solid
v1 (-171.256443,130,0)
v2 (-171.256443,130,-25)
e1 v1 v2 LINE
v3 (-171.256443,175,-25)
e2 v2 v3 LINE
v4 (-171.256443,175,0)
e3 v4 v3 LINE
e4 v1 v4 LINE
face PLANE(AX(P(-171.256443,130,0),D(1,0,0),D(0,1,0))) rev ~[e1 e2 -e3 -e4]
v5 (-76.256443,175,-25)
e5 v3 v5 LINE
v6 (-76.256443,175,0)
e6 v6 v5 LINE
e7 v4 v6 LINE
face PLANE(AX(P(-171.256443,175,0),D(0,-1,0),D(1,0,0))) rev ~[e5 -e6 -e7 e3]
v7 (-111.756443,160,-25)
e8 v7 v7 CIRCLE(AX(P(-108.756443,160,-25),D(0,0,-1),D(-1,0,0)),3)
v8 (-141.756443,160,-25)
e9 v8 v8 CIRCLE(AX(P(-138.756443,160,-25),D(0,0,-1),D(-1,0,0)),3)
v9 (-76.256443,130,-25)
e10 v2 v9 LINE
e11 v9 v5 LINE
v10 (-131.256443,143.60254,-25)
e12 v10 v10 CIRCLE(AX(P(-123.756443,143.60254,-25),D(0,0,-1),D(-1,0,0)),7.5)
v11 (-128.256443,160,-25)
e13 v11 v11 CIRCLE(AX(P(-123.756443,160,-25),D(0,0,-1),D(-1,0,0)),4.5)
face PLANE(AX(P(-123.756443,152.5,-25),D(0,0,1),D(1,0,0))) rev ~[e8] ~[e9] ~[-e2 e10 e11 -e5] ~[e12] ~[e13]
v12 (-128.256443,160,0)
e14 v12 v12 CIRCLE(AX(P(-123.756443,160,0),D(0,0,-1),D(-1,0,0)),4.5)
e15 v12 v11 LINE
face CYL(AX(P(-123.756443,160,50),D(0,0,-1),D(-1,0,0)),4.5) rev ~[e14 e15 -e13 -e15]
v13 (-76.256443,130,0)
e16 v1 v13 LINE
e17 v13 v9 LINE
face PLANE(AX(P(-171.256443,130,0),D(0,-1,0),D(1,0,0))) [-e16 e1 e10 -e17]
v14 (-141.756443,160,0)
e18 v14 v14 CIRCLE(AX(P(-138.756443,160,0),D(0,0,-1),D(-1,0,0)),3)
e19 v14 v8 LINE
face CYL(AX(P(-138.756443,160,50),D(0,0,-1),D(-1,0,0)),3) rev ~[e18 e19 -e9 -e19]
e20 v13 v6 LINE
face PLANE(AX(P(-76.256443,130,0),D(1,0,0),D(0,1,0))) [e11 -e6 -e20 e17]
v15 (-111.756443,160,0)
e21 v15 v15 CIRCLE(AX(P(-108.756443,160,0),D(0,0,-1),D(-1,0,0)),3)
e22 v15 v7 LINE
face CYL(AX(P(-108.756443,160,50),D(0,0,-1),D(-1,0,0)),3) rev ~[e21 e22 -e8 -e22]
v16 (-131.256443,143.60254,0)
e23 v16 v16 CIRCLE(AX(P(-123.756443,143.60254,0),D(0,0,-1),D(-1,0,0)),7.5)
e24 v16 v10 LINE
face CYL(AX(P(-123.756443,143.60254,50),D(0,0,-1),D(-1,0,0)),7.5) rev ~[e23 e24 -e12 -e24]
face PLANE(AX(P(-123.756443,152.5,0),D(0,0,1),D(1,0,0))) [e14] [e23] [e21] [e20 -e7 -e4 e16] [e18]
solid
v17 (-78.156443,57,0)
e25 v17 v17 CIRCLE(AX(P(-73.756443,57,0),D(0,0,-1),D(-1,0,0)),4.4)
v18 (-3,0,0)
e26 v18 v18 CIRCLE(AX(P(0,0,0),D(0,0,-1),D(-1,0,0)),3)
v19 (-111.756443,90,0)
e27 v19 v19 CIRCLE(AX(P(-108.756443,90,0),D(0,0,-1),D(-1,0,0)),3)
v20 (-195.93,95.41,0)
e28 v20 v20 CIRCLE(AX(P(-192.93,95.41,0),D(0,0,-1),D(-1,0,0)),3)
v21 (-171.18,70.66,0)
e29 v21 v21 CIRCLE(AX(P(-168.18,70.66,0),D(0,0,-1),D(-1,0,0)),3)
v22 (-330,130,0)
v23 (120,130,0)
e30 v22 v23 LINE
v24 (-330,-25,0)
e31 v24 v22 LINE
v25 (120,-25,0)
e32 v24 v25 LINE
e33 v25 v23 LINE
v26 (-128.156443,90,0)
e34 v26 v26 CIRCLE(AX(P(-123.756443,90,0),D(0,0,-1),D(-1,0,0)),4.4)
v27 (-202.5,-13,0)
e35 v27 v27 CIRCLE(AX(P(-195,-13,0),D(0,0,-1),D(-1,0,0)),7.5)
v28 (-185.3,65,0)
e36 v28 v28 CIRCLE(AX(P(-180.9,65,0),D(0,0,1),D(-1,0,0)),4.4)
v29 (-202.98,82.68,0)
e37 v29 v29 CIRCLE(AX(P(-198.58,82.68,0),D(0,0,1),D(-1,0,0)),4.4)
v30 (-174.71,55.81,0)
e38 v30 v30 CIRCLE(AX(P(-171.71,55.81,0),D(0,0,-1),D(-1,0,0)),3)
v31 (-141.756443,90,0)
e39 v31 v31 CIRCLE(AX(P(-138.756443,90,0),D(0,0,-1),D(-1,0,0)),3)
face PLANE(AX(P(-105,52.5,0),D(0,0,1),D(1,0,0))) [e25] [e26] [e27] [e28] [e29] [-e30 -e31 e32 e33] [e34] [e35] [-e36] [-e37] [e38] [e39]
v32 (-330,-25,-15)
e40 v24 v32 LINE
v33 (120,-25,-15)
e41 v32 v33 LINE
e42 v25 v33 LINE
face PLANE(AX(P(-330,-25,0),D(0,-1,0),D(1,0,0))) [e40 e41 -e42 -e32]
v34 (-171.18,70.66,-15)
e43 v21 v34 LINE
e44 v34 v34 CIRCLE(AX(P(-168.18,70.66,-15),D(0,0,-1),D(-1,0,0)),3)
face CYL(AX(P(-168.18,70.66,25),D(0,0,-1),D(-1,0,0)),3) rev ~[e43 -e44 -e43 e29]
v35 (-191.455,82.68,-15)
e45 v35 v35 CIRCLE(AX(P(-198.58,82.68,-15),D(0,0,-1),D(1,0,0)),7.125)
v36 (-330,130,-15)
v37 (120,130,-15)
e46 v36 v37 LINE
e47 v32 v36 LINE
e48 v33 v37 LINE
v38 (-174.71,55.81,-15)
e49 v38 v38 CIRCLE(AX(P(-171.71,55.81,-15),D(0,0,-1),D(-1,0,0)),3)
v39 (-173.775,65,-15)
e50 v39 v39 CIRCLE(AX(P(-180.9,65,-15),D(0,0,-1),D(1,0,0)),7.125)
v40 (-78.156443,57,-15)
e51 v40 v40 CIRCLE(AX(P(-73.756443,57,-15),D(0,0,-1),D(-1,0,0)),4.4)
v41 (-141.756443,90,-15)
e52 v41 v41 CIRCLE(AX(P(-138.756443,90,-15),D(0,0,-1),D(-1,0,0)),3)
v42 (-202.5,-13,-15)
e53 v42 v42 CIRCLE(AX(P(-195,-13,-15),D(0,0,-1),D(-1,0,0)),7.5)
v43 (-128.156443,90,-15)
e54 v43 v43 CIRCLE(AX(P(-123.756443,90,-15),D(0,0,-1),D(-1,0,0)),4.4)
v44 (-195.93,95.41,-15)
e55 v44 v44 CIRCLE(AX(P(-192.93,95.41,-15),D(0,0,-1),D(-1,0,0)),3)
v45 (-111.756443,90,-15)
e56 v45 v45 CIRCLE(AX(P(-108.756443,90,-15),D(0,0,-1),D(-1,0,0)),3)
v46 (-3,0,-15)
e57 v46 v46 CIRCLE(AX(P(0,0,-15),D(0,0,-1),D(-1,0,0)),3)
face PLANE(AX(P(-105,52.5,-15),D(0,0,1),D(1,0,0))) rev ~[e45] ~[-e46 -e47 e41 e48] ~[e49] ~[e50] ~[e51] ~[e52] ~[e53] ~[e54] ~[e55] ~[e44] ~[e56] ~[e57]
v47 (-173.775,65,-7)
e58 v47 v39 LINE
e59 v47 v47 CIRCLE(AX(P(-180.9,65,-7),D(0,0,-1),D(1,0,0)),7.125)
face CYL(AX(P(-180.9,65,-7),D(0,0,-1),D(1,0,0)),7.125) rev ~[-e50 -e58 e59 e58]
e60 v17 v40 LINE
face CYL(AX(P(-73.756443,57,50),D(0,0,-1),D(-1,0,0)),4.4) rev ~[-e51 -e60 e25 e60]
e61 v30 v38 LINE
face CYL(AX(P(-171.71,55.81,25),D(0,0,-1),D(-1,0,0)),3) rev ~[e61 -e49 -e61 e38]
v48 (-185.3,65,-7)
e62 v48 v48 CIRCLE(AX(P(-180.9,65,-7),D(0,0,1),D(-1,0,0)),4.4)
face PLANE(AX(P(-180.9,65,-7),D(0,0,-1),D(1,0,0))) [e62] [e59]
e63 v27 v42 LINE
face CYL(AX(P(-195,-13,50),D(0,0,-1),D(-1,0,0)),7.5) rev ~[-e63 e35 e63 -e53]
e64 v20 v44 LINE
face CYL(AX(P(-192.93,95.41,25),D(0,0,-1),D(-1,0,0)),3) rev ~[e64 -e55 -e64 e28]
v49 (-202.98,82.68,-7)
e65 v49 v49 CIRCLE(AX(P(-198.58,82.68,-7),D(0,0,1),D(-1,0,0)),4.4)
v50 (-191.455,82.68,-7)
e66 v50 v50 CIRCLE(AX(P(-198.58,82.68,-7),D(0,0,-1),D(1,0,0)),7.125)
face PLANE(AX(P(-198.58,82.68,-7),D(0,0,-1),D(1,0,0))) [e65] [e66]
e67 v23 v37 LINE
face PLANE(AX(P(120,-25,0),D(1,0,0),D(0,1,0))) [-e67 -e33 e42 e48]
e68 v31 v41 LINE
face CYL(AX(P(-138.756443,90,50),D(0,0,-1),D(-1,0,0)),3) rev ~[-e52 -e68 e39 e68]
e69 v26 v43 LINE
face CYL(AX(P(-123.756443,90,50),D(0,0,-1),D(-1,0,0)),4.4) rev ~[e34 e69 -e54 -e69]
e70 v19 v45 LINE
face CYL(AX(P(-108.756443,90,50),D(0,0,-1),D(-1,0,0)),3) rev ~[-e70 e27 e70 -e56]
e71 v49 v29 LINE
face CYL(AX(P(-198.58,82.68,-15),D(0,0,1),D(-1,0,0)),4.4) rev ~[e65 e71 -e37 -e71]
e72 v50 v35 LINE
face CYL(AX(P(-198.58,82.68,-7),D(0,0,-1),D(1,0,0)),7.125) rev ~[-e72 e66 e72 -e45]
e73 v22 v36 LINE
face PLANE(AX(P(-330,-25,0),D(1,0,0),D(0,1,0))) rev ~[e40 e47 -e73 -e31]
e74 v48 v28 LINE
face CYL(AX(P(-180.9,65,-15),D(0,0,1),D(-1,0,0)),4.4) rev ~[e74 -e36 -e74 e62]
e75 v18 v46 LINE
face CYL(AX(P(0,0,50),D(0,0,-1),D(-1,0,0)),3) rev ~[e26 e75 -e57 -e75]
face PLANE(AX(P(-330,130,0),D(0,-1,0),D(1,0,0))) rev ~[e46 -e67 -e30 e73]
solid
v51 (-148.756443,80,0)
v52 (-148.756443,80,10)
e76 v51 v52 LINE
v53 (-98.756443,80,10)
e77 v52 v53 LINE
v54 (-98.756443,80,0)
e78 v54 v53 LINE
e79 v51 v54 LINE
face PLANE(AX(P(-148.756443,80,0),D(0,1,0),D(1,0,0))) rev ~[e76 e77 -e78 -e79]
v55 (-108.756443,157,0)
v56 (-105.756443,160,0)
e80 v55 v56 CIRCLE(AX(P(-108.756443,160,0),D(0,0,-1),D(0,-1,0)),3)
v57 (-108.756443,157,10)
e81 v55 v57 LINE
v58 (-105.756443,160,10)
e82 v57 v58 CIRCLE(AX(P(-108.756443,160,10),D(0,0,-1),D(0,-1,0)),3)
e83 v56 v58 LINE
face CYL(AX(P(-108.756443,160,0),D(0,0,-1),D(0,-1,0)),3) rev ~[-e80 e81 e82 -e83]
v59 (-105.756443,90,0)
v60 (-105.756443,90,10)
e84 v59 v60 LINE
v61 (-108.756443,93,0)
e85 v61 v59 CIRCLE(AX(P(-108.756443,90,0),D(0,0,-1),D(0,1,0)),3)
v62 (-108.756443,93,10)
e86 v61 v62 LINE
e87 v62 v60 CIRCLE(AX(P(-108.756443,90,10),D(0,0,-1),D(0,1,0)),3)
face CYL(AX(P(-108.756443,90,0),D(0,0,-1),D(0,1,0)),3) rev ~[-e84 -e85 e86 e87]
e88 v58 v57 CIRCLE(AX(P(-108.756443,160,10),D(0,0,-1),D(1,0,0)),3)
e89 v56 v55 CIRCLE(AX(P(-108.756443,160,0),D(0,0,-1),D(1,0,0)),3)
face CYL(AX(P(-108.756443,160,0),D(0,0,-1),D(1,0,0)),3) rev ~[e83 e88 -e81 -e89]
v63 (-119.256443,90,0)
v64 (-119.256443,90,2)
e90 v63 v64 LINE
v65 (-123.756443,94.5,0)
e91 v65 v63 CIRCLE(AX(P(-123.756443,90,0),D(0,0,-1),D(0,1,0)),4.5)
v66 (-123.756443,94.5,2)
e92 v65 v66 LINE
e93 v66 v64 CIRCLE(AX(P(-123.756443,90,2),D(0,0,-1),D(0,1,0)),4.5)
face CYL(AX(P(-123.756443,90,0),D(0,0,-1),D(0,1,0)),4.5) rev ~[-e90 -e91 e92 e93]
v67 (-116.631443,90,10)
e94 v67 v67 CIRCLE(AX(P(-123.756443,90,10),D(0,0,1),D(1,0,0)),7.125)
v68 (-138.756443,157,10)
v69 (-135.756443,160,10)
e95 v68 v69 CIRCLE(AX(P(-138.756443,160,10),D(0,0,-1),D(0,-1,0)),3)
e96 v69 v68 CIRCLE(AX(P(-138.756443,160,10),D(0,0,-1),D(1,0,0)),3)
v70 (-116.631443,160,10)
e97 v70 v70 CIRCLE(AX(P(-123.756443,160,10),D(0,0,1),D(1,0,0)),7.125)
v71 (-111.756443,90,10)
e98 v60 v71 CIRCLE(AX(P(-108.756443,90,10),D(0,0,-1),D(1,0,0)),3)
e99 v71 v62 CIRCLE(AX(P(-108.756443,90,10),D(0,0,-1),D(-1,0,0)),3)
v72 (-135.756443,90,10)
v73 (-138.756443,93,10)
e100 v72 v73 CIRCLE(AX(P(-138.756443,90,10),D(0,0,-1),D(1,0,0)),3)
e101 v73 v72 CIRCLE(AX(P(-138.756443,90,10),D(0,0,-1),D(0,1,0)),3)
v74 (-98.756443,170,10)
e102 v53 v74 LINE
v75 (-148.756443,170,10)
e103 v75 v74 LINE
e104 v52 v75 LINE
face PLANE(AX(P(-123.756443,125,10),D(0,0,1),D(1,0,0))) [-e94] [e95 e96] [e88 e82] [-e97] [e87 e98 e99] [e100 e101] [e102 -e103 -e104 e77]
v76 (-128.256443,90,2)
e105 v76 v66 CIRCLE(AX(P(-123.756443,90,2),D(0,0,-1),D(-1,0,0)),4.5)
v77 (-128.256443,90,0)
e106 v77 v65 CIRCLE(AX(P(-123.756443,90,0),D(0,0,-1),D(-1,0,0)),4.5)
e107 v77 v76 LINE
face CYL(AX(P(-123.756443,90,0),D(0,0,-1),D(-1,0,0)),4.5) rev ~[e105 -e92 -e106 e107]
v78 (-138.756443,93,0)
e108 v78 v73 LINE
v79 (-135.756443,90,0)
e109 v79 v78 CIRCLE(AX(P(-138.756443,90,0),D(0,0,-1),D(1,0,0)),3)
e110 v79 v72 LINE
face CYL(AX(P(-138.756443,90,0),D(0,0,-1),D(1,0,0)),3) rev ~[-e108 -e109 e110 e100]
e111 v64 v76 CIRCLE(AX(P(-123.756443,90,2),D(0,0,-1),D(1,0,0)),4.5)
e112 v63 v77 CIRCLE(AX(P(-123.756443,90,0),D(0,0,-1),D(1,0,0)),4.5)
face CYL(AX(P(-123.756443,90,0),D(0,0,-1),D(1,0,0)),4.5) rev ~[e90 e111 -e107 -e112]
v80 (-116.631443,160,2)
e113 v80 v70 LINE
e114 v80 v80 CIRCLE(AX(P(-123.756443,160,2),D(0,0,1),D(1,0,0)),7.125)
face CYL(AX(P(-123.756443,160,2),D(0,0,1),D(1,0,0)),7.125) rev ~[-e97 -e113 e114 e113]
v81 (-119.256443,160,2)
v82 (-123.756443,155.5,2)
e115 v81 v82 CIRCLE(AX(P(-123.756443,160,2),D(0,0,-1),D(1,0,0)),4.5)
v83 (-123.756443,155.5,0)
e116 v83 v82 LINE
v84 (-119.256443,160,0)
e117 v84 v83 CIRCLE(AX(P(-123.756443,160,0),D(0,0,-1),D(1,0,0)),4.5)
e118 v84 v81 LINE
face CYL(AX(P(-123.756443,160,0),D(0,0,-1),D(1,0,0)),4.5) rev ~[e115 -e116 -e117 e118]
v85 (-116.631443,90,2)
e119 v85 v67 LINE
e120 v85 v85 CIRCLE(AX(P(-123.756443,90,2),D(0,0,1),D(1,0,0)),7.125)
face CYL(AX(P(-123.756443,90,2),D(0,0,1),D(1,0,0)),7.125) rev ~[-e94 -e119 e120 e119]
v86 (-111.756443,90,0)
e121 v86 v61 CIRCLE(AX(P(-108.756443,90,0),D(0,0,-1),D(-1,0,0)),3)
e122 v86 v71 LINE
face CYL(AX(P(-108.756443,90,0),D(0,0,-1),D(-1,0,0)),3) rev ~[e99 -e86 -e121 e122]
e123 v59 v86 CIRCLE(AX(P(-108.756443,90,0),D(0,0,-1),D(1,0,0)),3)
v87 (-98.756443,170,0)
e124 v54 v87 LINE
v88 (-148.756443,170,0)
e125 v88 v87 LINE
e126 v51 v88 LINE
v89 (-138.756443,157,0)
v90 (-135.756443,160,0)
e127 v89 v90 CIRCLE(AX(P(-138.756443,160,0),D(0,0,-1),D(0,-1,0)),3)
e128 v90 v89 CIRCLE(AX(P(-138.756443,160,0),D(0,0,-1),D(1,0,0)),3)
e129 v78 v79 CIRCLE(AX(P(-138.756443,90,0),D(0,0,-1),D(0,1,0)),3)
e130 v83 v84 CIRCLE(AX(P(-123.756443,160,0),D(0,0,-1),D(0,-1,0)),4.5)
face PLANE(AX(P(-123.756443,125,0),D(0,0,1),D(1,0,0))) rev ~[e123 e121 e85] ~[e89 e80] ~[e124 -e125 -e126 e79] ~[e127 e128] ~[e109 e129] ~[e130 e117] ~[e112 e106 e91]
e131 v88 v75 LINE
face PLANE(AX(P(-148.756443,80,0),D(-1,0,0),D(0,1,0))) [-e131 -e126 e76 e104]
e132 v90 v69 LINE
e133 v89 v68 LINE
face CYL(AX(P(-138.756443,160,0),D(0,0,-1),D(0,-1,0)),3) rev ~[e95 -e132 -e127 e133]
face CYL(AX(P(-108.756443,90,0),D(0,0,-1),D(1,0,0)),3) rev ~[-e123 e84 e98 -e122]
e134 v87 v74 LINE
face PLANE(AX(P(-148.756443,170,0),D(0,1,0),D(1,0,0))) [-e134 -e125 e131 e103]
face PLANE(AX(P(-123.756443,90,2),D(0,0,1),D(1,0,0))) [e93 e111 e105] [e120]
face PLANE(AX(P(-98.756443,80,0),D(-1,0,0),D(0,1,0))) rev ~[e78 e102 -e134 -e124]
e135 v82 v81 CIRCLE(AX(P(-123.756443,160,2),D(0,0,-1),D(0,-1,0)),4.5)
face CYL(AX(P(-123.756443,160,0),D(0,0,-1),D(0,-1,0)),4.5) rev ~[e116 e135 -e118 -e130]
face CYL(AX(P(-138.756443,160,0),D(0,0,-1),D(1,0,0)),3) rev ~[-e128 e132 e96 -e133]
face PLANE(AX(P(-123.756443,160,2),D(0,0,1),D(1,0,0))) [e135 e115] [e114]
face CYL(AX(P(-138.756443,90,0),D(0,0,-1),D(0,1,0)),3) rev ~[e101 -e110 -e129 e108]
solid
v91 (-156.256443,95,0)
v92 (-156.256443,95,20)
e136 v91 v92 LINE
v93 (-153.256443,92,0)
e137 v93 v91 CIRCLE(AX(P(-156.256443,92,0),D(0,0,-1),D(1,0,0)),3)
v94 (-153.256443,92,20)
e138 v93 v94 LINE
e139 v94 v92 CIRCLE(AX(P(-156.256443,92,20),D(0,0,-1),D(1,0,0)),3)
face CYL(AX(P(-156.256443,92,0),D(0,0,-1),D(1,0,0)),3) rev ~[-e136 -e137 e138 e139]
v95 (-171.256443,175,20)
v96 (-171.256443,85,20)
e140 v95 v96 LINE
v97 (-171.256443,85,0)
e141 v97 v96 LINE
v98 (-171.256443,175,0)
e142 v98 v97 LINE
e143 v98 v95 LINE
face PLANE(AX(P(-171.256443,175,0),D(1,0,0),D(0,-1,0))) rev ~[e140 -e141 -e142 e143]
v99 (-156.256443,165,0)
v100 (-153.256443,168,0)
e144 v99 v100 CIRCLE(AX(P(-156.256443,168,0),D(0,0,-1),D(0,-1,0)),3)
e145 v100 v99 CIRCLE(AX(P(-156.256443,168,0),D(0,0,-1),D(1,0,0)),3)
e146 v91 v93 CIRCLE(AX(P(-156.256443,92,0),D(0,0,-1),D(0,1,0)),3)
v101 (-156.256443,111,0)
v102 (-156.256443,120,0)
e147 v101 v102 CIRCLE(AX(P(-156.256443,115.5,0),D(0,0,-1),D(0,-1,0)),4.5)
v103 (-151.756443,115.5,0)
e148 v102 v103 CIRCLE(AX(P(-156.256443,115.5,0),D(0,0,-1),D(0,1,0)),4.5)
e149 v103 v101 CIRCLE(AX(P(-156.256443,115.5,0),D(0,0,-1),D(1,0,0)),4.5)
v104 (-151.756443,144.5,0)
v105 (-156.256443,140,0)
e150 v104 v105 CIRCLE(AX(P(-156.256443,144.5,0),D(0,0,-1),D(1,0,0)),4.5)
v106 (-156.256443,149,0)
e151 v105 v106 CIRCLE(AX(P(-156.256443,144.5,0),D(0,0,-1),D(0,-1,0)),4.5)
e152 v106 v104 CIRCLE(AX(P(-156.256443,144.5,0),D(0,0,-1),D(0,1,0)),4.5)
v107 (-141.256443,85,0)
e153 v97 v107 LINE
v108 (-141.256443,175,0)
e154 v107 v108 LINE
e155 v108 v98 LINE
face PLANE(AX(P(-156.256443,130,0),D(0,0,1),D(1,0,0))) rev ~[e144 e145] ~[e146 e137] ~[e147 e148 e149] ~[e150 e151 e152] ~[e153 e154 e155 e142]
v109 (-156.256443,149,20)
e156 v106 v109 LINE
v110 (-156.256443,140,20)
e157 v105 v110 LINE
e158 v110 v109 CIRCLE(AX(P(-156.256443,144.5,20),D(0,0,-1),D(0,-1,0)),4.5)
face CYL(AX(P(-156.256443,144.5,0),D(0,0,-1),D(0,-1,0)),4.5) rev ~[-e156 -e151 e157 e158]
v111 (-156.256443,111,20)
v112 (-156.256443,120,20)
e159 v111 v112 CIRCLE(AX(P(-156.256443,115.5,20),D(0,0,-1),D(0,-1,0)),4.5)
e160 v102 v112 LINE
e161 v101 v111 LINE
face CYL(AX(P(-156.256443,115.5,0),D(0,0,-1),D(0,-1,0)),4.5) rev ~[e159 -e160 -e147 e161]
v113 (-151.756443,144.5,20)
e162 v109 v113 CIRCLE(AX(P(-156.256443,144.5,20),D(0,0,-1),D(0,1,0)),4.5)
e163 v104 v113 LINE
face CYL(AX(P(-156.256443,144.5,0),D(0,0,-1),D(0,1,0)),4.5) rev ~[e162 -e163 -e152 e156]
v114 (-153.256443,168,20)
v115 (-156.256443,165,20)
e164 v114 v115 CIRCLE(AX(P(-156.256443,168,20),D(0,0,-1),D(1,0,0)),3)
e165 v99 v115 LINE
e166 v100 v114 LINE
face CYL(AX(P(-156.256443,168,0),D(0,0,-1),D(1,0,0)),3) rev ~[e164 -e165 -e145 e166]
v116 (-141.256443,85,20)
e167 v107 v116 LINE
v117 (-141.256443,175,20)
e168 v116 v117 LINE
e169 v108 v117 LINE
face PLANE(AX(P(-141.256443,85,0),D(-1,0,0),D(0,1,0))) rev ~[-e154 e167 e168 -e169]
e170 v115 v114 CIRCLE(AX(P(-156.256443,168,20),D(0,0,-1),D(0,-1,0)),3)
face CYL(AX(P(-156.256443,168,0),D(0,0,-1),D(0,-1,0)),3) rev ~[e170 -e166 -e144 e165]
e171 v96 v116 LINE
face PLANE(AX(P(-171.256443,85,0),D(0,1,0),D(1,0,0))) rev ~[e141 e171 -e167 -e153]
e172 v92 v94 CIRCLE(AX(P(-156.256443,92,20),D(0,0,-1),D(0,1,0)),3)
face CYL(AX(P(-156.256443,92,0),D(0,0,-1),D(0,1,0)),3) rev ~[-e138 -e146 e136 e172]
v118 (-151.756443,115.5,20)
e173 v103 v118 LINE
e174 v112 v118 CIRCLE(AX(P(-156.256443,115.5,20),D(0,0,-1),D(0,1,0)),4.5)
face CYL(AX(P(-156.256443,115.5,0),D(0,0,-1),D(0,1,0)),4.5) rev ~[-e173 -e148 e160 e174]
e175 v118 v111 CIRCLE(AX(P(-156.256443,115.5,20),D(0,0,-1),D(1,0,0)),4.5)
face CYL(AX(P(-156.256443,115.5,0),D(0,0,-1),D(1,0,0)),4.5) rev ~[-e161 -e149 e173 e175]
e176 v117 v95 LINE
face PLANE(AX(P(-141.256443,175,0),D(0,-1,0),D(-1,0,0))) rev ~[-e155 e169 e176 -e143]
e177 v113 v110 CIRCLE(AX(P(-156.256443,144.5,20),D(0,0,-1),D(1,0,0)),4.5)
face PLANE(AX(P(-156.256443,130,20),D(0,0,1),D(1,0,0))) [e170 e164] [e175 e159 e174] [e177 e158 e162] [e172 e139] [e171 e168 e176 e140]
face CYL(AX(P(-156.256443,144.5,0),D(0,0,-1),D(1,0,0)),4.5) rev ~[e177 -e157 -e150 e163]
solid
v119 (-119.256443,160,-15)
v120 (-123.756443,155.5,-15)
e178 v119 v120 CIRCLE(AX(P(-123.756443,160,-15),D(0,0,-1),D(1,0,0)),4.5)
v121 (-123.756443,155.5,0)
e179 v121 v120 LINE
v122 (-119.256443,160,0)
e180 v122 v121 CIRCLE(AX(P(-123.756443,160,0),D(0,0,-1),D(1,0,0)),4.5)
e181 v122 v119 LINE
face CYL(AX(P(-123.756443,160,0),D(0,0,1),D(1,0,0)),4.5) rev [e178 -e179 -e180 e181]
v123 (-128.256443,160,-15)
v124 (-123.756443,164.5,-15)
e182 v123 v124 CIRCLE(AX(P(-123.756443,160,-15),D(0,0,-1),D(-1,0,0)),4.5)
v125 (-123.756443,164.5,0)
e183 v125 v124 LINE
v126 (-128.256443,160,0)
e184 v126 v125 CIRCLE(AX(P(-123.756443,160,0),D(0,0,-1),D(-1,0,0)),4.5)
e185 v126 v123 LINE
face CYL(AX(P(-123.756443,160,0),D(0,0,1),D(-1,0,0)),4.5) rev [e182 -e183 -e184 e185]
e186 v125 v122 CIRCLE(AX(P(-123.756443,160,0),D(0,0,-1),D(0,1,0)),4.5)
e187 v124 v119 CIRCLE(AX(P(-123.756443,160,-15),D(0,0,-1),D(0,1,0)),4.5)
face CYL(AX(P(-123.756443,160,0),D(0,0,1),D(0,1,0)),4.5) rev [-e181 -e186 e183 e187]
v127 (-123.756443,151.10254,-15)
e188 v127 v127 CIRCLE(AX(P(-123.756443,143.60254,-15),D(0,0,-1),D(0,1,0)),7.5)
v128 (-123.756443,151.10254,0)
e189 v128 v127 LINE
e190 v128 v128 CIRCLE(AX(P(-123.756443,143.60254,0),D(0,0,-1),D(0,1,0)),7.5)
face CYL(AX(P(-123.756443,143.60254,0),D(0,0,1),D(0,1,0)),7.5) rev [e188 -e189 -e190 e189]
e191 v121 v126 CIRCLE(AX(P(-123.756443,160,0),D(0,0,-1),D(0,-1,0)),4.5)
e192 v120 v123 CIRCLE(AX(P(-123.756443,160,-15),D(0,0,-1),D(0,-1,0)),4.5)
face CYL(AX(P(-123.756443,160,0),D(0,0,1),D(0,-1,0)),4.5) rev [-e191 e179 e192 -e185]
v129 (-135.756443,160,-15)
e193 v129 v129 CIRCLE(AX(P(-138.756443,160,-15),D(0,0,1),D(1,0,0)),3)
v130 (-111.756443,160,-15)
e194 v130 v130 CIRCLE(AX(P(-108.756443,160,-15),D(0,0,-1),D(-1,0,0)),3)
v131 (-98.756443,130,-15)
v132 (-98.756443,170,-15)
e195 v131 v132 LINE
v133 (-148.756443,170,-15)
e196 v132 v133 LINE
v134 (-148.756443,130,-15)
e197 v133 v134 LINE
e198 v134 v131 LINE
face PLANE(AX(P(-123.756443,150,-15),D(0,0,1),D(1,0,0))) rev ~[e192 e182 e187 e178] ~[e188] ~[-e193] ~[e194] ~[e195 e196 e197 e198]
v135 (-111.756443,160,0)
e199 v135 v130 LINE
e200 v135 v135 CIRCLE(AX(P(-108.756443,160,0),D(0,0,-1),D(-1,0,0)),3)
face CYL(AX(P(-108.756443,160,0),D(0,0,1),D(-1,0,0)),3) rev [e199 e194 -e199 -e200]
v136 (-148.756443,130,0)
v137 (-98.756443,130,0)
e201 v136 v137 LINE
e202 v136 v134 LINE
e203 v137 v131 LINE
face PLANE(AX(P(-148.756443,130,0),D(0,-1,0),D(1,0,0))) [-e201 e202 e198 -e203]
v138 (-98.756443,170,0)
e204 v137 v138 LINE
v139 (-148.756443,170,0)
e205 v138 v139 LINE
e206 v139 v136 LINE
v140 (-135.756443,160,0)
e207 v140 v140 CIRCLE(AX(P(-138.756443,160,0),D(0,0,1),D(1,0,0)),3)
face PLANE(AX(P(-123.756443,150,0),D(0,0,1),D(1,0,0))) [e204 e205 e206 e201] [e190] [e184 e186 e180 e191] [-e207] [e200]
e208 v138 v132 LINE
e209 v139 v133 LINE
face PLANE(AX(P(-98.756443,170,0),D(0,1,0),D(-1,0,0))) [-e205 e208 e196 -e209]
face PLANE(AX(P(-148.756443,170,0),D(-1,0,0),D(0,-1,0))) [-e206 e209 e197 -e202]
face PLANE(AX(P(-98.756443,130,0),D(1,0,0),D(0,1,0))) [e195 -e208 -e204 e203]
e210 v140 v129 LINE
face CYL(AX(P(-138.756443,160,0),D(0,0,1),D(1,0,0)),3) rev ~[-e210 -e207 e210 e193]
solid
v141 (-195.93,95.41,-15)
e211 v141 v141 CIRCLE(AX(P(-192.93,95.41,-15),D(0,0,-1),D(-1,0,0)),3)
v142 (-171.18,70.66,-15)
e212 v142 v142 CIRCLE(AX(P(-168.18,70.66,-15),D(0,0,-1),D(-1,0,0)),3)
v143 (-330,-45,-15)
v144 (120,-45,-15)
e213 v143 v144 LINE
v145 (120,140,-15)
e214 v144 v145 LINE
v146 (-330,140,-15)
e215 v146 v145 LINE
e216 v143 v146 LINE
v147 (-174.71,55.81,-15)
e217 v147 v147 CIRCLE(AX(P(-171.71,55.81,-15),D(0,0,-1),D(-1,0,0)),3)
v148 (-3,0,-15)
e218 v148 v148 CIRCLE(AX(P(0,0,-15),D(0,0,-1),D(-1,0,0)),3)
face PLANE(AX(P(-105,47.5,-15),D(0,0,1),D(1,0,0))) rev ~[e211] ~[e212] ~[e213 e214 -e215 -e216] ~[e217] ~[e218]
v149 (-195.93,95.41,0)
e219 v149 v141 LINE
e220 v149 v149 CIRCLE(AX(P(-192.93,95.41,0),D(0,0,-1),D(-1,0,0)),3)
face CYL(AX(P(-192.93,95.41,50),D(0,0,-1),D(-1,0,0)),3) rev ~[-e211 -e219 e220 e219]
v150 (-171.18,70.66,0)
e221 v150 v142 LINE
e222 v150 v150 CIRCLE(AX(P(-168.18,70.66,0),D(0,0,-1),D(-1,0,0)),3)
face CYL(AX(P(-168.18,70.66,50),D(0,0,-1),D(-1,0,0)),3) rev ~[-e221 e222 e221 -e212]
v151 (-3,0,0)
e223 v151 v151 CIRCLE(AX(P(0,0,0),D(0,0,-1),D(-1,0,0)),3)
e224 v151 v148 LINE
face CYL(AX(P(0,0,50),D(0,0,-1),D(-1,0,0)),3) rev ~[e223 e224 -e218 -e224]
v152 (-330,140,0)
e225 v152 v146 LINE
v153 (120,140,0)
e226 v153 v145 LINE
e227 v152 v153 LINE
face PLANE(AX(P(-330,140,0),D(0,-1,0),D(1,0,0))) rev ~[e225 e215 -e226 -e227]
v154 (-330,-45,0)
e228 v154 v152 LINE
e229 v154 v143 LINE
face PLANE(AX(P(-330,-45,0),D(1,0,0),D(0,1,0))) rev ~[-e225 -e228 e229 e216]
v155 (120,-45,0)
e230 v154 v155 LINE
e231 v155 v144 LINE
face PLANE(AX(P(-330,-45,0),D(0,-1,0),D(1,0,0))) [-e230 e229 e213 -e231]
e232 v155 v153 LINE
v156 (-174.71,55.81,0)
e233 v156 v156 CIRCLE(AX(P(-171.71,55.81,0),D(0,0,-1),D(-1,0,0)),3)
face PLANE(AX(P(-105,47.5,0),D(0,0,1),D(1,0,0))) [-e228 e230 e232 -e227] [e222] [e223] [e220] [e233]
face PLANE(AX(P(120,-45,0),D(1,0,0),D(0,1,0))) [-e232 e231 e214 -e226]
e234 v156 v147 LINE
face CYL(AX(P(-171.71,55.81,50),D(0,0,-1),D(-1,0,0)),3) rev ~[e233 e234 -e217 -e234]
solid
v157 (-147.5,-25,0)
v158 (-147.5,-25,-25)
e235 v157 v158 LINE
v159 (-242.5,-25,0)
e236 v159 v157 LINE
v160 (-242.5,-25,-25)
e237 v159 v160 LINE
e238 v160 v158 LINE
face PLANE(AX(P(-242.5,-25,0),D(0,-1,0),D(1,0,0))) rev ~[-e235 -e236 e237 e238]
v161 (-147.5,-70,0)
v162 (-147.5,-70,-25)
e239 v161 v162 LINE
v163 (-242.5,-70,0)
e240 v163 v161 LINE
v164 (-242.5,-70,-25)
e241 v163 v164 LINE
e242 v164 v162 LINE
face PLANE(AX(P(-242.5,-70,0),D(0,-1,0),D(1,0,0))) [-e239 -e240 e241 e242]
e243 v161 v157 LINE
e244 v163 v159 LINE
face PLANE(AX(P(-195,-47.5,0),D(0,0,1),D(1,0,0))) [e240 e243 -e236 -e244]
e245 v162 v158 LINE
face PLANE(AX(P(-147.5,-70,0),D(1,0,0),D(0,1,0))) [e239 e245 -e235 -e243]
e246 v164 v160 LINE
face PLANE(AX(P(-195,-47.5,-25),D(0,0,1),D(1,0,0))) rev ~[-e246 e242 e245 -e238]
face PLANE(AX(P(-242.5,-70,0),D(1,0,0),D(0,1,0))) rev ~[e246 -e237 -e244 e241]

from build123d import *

# Parameters (mm, degrees)
F0_W             = 450
F0_H             = 155
F1_DEPTH         = 15
F4_W             = 95
F4_H             = 45
F5_DEPTH         = 25
F7_DEPTH         = 20
F9_D             = 6
F9_DEPTH         = 25
F9_TIP           = 1.8025818571
F11_D            = 8.8
F11_DEPTH        = 25
F11_CBORE_D      = 14.25
F11_CBORE_DEPTH  = 8
F11_TIP          = 2.6437867237
F13_R            = 3
F14_DEPTH        = 15
F15_W            = 50
F15_H            = 90
F16_DEPTH        = 10
F18_D            = 8.8
F18_DEPTH        = 15.75
F18_CBORE_D      = 14.25
F18_CBORE_DEPTH  = 8
F18_TIP          = 2.6437867237
F19_D            = 8.8
F19_DEPTH        = 50
F19_TIP          = 2.6437867237
F21_D            = 8.8
F21_DEPTH        = 50
F21_TIP          = 2.6437867237
F22_D            = 15
F22_DEPTH        = 50
F22_TIP          = 4.5064546427
F23_W            = 450
F23_H            = 185
F24_DEPTH        = 15
F25_D            = 6
F25_DEPTH        = 50
F25_TIP          = 1.8025818571
F27_D            = 6
F27_DEPTH        = 50
F27_TIP          = 1.8025818571
F27_2_D          = 6
F27_2_DEPTH      = 50
F27_2_TIP        = 1.8025818571
F28_D            = 15
F28_DEPTH        = 50
F28_TIP          = 4.5064546427
F29_D            = 6
F29_DEPTH        = 50
F29_TIP          = 1.8025818571
F29_ON_F15_D     = 6
F29_ON_F15_DEPTH = 50
F29_ON_F15_TIP   = 1.8025818571
F30_D            = 9
F30_DEPTH        = 50
F30_TIP          = 2.7038727856


# Not quite as in the source:
# - a feature of the source that left no trace in its solid (it failed there, or was rolled back) is left out


with BuildPart() as f1:
    # F0 (on Top) → F1 (new body)
    with BuildSketch(Plane.XY):
        with Locations((-105, 52.5)):
            Rectangle(F0_W, F0_H)
    extrude(amount=-F1_DEPTH)

    # F9
    with Locations(Plane.XY):
        with Locations((-192.93, 95.41), (-168.18, 70.66), (-171.71, 55.81)):
            Hole(F9_D / 2, depth=F9_DEPTH)
            with Locations((0, 0, -(F9_DEPTH + F9_TIP / 2))):  # 118° drill point
                Cone(0, F9_D / 2, F9_TIP, mode=Mode.SUBTRACT)

    # F11
    with Locations(Plane(origin=(0, 0, -15), x_dir=(1, 0, 0), z_dir=(0, 0, -1))):
        with Locations((-180.9, -65), (-198.58, -82.68)):
            CounterBoreHole(F11_D / 2, F11_CBORE_D / 2, F11_CBORE_DEPTH, depth=F11_DEPTH)
            with Locations((0, 0, -(F11_DEPTH + F11_TIP / 2))):  # 118° drill point
                Cone(0, F11_D / 2, F11_TIP, mode=Mode.SUBTRACT)

    # F19
    with Locations(Plane.XY):
        with Locations((-123.7564434702, 90)):
            Hole(F19_D / 2, depth=F19_DEPTH)
            with Locations((0, 0, -(F19_DEPTH + F19_TIP / 2))):  # 118° drill point
                Cone(0, F19_D / 2, F19_TIP, mode=Mode.SUBTRACT)

    # F21
    with Locations(Plane.XY):
        with Locations((-73.7564434702, 57)):
            Hole(F21_D / 2, depth=F21_DEPTH)
            with Locations((0, 0, -(F21_DEPTH + F21_TIP / 2))):  # 118° drill point
                Cone(0, F21_D / 2, F21_TIP, mode=Mode.SUBTRACT)

    # F22
    with Locations(Plane.XY):
        with Locations((-195, -13)):
            Hole(F22_D / 2, depth=F22_DEPTH)
            with Locations((0, 0, -(F22_DEPTH + F22_TIP / 2))):  # 118° drill point
                Cone(0, F22_D / 2, F22_TIP, mode=Mode.SUBTRACT)

    # F27
    with Locations(Plane.XY):
        with Locations((0, 0)):
            Hole(F27_D / 2, depth=F27_DEPTH)
            with Locations((0, 0, -(F27_DEPTH + F27_TIP / 2))):  # 118° drill point
                Cone(0, F27_D / 2, F27_TIP, mode=Mode.SUBTRACT)

    # F29 on F15
    with Locations(Plane.XY):
        with Locations((-138.7564434702, 90), (-108.7564434702, 90)):
            Hole(F29_ON_F15_D / 2, depth=F29_ON_F15_DEPTH)
            with Locations((0, 0, -(F29_ON_F15_DEPTH + F29_ON_F15_TIP / 2))):  # 118° drill point
                Cone(0, F29_ON_F15_D / 2, F29_ON_F15_TIP, mode=Mode.SUBTRACT)


with BuildPart() as f5:
    # F4 (on face) → F5 (new body)
    with BuildSketch(Plane.XY):
        with Locations((-195, -47.5)):
            Rectangle(F4_W, F4_H)
    extrude(amount=-F5_DEPTH)


with BuildPart() as f5b:
    # F4 (on face) → F5, piece 2 (new body)
    with BuildSketch(Plane.XY):
        with Locations((-123.7564434702, 152.5)):
            Rectangle(F4_W, F4_H)
    extrude(amount=-F5_DEPTH)

    # F28
    with Locations(Plane.XY):
        with Locations((-123.7564434702, 143.6025403784)):
            Hole(F28_D / 2, depth=F28_DEPTH)
            with Locations((0, 0, -(F28_DEPTH + F28_TIP / 2))):  # 118° drill point
                Cone(0, F28_D / 2, F28_TIP, mode=Mode.SUBTRACT)

    # F29
    with Locations(Plane.XY):
        with Locations((-108.7564434702, 160), (-138.7564434702, 160)):
            Hole(F29_D / 2, depth=F29_DEPTH)
            with Locations((0, 0, -(F29_DEPTH + F29_TIP / 2))):  # 118° drill point
                Cone(0, F29_D / 2, F29_TIP, mode=Mode.SUBTRACT)

    # F30
    with Locations(Plane.XY):
        with Locations((-123.7564434702, 160)):
            Hole(F30_D / 2, depth=F30_DEPTH)
            with Locations((0, 0, -(F30_DEPTH + F30_TIP / 2))):  # 118° drill point
                Cone(0, F30_D / 2, F30_TIP, mode=Mode.SUBTRACT)


with BuildPart() as f7:
    # F6 (on face) → F7 (new body)
    with BuildSketch(Plane.XY):
        Polygon((-141.2564434702, 175), (-171.2564434702, 175), (-171.2564434702, 85), (-141.2564434702, 85), (-141.2564434702, 168), align=None)
        with BuildLine():
            ThreePointArc((-153.2564434702, 92), (-158.3777638137, 89.8786796564), (-156.2564434702, 95))
            ThreePointArc((-156.2564434702, 95), (-154.1351231266, 94.1213203436), (-153.2564434702, 92))
        make_face(mode=Mode.SUBTRACT)
        with BuildLine():
            ThreePointArc((-156.2564434702, 111), (-160.7564434702, 115.5), (-156.2564434702, 120))
            ThreePointArc((-156.2564434702, 120), (-153.0744629548, 118.6819805153), (-151.7564434702, 115.5))
            ThreePointArc((-151.7564434702, 115.5), (-153.0744629548, 112.3180194847), (-156.2564434702, 111))
        make_face(mode=Mode.SUBTRACT)
        with BuildLine():
            ThreePointArc((-156.2564434702, 140), (-160.7564434702, 144.5), (-156.2564434702, 149))
            ThreePointArc((-156.2564434702, 149), (-153.0744629548, 147.6819805153), (-151.7564434702, 144.5))
            ThreePointArc((-151.7564434702, 144.5), (-153.0744629548, 141.3180194847), (-156.2564434702, 140))
        make_face(mode=Mode.SUBTRACT)
        with BuildLine():
            ThreePointArc((-156.2564434702, 165), (-158.3777638137, 170.1213203436), (-153.2564434702, 168))
            ThreePointArc((-153.2564434702, 168), (-154.1351231266, 165.8786796564), (-156.2564434702, 165))
        make_face(mode=Mode.SUBTRACT)
    extrude(amount=F7_DEPTH)


with BuildPart() as f14:
    # F13 (on face) → F14 (new body)
    with BuildSketch(Plane.XY):
        Polygon((-148.7564434702, 170), (-148.7564434702, 130), (-98.7564434702, 130), (-98.7564434702, 170), (-123.7564434702, 170), align=None)
        with BuildLine():
            ThreePointArc((-116.2564434702, 143.6025403784), (-129.0597443291, 138.2992395195), (-123.7564434702, 151.1025403784))
            ThreePointArc((-123.7564434702, 151.1025403784), (-118.4531426113, 148.9058412373), (-116.2564434702, 143.6025403784))
        make_face(mode=Mode.SUBTRACT)
        with Locations((-138.7564434702, 160)):
            Circle(F13_R, mode=Mode.SUBTRACT)
        with BuildLine():
            ThreePointArc((-128.2564434702, 160), (-126.9384239855, 163.1819805153), (-123.7564434702, 164.5))
            ThreePointArc((-123.7564434702, 164.5), (-120.5744629548, 163.1819805153), (-119.2564434702, 160))
            ThreePointArc((-119.2564434702, 160), (-120.5744629548, 156.8180194847), (-123.7564434702, 155.5))
            ThreePointArc((-123.7564434702, 155.5), (-126.9384239855, 156.8180194847), (-128.2564434702, 160))
        make_face(mode=Mode.SUBTRACT)
        with BuildLine():
            ThreePointArc((-105.7564434702, 160), (-108.7564434702, 157), (-111.7564434702, 160))
            ThreePointArc((-111.7564434702, 160), (-108.7564434702, 163), (-105.7564434702, 160))
        make_face(mode=Mode.SUBTRACT)
    extrude(amount=-F14_DEPTH)


with BuildPart() as f16:
    # F15 (on face) → F16 (new body)
    with BuildSketch(Plane.XY):
        with Locations((-123.7564434702, 125)):
            Rectangle(F15_W, F15_H)
        with BuildLine():
            ThreePointArc((-138.7564434702, 93), (-136.6351231266, 92.1213203436), (-135.7564434702, 90))
            ThreePointArc((-135.7564434702, 90), (-140.8777638137, 87.8786796564), (-138.7564434702, 93))
        make_face(mode=Mode.SUBTRACT)
        with BuildLine():
            ThreePointArc((-119.2564434702, 90), (-123.7564434702, 85.5), (-128.2564434702, 90))
            ThreePointArc((-128.2564434702, 90), (-126.9384239855, 93.1819805153), (-123.7564434702, 94.5))
            ThreePointArc((-123.7564434702, 94.5), (-120.5744629548, 93.1819805153), (-119.2564434702, 90))
        make_face(mode=Mode.SUBTRACT)
        with BuildLine():
            ThreePointArc((-105.7564434702, 90), (-108.7564434702, 87), (-111.7564434702, 90))
            ThreePointArc((-111.7564434702, 90), (-110.8777638137, 92.1213203436), (-108.7564434702, 93))
            ThreePointArc((-108.7564434702, 93), (-106.6351231266, 92.1213203436), (-105.7564434702, 90))
        make_face(mode=Mode.SUBTRACT)
        with BuildLine():
            ThreePointArc((-135.7564434702, 160), (-136.6351231266, 157.8786796564), (-138.7564434702, 157))
            ThreePointArc((-138.7564434702, 157), (-140.8777638137, 162.1213203436), (-135.7564434702, 160))
        make_face(mode=Mode.SUBTRACT)
        with BuildLine():
            ThreePointArc((-119.2564434702, 160), (-120.5744629548, 156.8180194847), (-123.7564434702, 155.5))
            ThreePointArc((-123.7564434702, 155.5), (-126.9384239855, 163.1819805153), (-119.2564434702, 160))
        make_face(mode=Mode.SUBTRACT)
        with BuildLine():
            ThreePointArc((-105.7564434702, 160), (-106.6351231266, 157.8786796564), (-108.7564434702, 157))
            ThreePointArc((-108.7564434702, 157), (-110.8777638137, 162.1213203436), (-105.7564434702, 160))
        make_face(mode=Mode.SUBTRACT)
    extrude(amount=F16_DEPTH)

    # F18
    with Locations(Plane.XY.offset(10)):
        with Locations((-123.7564434702, 160), (-123.7564434702, 90)):
            CounterBoreHole(F18_D / 2, F18_CBORE_D / 2, F18_CBORE_DEPTH, depth=F18_DEPTH)
            with Locations((0, 0, -(F18_DEPTH + F18_TIP / 2))):  # 118° drill point
                Cone(0, F18_D / 2, F18_TIP, mode=Mode.SUBTRACT)


with BuildPart() as f24:
    # F23 (on face) → F24 (new body)
    with BuildSketch(Plane.XY):
        with Locations((-105, 47.5)):
            Rectangle(F23_W, F23_H)
    extrude(amount=-F24_DEPTH)

    # F25
    with Locations(Plane.XY):
        with Locations((-192.93, 95.41), (-168.18, 70.66), (-171.71, 55.81)):
            Hole(F25_D / 2, depth=F25_DEPTH)
            with Locations((0, 0, -(F25_DEPTH + F25_TIP / 2))):  # 118° drill point
                Cone(0, F25_D / 2, F25_TIP, mode=Mode.SUBTRACT)

    # F27#2
    with Locations(Plane.XY):
        with Locations((0, 0)):
            Hole(F27_2_D / 2, depth=F27_2_DEPTH)
            with Locations((0, 0, -(F27_2_DEPTH + F27_2_TIP / 2))):  # 118° drill point
                Cone(0, F27_2_D / 2, F27_2_TIP, mode=Mode.SUBTRACT)


solid = Compound([f1.part, f5.part, f5b.part, f7.part, f14.part, f16.part, f24.part])
